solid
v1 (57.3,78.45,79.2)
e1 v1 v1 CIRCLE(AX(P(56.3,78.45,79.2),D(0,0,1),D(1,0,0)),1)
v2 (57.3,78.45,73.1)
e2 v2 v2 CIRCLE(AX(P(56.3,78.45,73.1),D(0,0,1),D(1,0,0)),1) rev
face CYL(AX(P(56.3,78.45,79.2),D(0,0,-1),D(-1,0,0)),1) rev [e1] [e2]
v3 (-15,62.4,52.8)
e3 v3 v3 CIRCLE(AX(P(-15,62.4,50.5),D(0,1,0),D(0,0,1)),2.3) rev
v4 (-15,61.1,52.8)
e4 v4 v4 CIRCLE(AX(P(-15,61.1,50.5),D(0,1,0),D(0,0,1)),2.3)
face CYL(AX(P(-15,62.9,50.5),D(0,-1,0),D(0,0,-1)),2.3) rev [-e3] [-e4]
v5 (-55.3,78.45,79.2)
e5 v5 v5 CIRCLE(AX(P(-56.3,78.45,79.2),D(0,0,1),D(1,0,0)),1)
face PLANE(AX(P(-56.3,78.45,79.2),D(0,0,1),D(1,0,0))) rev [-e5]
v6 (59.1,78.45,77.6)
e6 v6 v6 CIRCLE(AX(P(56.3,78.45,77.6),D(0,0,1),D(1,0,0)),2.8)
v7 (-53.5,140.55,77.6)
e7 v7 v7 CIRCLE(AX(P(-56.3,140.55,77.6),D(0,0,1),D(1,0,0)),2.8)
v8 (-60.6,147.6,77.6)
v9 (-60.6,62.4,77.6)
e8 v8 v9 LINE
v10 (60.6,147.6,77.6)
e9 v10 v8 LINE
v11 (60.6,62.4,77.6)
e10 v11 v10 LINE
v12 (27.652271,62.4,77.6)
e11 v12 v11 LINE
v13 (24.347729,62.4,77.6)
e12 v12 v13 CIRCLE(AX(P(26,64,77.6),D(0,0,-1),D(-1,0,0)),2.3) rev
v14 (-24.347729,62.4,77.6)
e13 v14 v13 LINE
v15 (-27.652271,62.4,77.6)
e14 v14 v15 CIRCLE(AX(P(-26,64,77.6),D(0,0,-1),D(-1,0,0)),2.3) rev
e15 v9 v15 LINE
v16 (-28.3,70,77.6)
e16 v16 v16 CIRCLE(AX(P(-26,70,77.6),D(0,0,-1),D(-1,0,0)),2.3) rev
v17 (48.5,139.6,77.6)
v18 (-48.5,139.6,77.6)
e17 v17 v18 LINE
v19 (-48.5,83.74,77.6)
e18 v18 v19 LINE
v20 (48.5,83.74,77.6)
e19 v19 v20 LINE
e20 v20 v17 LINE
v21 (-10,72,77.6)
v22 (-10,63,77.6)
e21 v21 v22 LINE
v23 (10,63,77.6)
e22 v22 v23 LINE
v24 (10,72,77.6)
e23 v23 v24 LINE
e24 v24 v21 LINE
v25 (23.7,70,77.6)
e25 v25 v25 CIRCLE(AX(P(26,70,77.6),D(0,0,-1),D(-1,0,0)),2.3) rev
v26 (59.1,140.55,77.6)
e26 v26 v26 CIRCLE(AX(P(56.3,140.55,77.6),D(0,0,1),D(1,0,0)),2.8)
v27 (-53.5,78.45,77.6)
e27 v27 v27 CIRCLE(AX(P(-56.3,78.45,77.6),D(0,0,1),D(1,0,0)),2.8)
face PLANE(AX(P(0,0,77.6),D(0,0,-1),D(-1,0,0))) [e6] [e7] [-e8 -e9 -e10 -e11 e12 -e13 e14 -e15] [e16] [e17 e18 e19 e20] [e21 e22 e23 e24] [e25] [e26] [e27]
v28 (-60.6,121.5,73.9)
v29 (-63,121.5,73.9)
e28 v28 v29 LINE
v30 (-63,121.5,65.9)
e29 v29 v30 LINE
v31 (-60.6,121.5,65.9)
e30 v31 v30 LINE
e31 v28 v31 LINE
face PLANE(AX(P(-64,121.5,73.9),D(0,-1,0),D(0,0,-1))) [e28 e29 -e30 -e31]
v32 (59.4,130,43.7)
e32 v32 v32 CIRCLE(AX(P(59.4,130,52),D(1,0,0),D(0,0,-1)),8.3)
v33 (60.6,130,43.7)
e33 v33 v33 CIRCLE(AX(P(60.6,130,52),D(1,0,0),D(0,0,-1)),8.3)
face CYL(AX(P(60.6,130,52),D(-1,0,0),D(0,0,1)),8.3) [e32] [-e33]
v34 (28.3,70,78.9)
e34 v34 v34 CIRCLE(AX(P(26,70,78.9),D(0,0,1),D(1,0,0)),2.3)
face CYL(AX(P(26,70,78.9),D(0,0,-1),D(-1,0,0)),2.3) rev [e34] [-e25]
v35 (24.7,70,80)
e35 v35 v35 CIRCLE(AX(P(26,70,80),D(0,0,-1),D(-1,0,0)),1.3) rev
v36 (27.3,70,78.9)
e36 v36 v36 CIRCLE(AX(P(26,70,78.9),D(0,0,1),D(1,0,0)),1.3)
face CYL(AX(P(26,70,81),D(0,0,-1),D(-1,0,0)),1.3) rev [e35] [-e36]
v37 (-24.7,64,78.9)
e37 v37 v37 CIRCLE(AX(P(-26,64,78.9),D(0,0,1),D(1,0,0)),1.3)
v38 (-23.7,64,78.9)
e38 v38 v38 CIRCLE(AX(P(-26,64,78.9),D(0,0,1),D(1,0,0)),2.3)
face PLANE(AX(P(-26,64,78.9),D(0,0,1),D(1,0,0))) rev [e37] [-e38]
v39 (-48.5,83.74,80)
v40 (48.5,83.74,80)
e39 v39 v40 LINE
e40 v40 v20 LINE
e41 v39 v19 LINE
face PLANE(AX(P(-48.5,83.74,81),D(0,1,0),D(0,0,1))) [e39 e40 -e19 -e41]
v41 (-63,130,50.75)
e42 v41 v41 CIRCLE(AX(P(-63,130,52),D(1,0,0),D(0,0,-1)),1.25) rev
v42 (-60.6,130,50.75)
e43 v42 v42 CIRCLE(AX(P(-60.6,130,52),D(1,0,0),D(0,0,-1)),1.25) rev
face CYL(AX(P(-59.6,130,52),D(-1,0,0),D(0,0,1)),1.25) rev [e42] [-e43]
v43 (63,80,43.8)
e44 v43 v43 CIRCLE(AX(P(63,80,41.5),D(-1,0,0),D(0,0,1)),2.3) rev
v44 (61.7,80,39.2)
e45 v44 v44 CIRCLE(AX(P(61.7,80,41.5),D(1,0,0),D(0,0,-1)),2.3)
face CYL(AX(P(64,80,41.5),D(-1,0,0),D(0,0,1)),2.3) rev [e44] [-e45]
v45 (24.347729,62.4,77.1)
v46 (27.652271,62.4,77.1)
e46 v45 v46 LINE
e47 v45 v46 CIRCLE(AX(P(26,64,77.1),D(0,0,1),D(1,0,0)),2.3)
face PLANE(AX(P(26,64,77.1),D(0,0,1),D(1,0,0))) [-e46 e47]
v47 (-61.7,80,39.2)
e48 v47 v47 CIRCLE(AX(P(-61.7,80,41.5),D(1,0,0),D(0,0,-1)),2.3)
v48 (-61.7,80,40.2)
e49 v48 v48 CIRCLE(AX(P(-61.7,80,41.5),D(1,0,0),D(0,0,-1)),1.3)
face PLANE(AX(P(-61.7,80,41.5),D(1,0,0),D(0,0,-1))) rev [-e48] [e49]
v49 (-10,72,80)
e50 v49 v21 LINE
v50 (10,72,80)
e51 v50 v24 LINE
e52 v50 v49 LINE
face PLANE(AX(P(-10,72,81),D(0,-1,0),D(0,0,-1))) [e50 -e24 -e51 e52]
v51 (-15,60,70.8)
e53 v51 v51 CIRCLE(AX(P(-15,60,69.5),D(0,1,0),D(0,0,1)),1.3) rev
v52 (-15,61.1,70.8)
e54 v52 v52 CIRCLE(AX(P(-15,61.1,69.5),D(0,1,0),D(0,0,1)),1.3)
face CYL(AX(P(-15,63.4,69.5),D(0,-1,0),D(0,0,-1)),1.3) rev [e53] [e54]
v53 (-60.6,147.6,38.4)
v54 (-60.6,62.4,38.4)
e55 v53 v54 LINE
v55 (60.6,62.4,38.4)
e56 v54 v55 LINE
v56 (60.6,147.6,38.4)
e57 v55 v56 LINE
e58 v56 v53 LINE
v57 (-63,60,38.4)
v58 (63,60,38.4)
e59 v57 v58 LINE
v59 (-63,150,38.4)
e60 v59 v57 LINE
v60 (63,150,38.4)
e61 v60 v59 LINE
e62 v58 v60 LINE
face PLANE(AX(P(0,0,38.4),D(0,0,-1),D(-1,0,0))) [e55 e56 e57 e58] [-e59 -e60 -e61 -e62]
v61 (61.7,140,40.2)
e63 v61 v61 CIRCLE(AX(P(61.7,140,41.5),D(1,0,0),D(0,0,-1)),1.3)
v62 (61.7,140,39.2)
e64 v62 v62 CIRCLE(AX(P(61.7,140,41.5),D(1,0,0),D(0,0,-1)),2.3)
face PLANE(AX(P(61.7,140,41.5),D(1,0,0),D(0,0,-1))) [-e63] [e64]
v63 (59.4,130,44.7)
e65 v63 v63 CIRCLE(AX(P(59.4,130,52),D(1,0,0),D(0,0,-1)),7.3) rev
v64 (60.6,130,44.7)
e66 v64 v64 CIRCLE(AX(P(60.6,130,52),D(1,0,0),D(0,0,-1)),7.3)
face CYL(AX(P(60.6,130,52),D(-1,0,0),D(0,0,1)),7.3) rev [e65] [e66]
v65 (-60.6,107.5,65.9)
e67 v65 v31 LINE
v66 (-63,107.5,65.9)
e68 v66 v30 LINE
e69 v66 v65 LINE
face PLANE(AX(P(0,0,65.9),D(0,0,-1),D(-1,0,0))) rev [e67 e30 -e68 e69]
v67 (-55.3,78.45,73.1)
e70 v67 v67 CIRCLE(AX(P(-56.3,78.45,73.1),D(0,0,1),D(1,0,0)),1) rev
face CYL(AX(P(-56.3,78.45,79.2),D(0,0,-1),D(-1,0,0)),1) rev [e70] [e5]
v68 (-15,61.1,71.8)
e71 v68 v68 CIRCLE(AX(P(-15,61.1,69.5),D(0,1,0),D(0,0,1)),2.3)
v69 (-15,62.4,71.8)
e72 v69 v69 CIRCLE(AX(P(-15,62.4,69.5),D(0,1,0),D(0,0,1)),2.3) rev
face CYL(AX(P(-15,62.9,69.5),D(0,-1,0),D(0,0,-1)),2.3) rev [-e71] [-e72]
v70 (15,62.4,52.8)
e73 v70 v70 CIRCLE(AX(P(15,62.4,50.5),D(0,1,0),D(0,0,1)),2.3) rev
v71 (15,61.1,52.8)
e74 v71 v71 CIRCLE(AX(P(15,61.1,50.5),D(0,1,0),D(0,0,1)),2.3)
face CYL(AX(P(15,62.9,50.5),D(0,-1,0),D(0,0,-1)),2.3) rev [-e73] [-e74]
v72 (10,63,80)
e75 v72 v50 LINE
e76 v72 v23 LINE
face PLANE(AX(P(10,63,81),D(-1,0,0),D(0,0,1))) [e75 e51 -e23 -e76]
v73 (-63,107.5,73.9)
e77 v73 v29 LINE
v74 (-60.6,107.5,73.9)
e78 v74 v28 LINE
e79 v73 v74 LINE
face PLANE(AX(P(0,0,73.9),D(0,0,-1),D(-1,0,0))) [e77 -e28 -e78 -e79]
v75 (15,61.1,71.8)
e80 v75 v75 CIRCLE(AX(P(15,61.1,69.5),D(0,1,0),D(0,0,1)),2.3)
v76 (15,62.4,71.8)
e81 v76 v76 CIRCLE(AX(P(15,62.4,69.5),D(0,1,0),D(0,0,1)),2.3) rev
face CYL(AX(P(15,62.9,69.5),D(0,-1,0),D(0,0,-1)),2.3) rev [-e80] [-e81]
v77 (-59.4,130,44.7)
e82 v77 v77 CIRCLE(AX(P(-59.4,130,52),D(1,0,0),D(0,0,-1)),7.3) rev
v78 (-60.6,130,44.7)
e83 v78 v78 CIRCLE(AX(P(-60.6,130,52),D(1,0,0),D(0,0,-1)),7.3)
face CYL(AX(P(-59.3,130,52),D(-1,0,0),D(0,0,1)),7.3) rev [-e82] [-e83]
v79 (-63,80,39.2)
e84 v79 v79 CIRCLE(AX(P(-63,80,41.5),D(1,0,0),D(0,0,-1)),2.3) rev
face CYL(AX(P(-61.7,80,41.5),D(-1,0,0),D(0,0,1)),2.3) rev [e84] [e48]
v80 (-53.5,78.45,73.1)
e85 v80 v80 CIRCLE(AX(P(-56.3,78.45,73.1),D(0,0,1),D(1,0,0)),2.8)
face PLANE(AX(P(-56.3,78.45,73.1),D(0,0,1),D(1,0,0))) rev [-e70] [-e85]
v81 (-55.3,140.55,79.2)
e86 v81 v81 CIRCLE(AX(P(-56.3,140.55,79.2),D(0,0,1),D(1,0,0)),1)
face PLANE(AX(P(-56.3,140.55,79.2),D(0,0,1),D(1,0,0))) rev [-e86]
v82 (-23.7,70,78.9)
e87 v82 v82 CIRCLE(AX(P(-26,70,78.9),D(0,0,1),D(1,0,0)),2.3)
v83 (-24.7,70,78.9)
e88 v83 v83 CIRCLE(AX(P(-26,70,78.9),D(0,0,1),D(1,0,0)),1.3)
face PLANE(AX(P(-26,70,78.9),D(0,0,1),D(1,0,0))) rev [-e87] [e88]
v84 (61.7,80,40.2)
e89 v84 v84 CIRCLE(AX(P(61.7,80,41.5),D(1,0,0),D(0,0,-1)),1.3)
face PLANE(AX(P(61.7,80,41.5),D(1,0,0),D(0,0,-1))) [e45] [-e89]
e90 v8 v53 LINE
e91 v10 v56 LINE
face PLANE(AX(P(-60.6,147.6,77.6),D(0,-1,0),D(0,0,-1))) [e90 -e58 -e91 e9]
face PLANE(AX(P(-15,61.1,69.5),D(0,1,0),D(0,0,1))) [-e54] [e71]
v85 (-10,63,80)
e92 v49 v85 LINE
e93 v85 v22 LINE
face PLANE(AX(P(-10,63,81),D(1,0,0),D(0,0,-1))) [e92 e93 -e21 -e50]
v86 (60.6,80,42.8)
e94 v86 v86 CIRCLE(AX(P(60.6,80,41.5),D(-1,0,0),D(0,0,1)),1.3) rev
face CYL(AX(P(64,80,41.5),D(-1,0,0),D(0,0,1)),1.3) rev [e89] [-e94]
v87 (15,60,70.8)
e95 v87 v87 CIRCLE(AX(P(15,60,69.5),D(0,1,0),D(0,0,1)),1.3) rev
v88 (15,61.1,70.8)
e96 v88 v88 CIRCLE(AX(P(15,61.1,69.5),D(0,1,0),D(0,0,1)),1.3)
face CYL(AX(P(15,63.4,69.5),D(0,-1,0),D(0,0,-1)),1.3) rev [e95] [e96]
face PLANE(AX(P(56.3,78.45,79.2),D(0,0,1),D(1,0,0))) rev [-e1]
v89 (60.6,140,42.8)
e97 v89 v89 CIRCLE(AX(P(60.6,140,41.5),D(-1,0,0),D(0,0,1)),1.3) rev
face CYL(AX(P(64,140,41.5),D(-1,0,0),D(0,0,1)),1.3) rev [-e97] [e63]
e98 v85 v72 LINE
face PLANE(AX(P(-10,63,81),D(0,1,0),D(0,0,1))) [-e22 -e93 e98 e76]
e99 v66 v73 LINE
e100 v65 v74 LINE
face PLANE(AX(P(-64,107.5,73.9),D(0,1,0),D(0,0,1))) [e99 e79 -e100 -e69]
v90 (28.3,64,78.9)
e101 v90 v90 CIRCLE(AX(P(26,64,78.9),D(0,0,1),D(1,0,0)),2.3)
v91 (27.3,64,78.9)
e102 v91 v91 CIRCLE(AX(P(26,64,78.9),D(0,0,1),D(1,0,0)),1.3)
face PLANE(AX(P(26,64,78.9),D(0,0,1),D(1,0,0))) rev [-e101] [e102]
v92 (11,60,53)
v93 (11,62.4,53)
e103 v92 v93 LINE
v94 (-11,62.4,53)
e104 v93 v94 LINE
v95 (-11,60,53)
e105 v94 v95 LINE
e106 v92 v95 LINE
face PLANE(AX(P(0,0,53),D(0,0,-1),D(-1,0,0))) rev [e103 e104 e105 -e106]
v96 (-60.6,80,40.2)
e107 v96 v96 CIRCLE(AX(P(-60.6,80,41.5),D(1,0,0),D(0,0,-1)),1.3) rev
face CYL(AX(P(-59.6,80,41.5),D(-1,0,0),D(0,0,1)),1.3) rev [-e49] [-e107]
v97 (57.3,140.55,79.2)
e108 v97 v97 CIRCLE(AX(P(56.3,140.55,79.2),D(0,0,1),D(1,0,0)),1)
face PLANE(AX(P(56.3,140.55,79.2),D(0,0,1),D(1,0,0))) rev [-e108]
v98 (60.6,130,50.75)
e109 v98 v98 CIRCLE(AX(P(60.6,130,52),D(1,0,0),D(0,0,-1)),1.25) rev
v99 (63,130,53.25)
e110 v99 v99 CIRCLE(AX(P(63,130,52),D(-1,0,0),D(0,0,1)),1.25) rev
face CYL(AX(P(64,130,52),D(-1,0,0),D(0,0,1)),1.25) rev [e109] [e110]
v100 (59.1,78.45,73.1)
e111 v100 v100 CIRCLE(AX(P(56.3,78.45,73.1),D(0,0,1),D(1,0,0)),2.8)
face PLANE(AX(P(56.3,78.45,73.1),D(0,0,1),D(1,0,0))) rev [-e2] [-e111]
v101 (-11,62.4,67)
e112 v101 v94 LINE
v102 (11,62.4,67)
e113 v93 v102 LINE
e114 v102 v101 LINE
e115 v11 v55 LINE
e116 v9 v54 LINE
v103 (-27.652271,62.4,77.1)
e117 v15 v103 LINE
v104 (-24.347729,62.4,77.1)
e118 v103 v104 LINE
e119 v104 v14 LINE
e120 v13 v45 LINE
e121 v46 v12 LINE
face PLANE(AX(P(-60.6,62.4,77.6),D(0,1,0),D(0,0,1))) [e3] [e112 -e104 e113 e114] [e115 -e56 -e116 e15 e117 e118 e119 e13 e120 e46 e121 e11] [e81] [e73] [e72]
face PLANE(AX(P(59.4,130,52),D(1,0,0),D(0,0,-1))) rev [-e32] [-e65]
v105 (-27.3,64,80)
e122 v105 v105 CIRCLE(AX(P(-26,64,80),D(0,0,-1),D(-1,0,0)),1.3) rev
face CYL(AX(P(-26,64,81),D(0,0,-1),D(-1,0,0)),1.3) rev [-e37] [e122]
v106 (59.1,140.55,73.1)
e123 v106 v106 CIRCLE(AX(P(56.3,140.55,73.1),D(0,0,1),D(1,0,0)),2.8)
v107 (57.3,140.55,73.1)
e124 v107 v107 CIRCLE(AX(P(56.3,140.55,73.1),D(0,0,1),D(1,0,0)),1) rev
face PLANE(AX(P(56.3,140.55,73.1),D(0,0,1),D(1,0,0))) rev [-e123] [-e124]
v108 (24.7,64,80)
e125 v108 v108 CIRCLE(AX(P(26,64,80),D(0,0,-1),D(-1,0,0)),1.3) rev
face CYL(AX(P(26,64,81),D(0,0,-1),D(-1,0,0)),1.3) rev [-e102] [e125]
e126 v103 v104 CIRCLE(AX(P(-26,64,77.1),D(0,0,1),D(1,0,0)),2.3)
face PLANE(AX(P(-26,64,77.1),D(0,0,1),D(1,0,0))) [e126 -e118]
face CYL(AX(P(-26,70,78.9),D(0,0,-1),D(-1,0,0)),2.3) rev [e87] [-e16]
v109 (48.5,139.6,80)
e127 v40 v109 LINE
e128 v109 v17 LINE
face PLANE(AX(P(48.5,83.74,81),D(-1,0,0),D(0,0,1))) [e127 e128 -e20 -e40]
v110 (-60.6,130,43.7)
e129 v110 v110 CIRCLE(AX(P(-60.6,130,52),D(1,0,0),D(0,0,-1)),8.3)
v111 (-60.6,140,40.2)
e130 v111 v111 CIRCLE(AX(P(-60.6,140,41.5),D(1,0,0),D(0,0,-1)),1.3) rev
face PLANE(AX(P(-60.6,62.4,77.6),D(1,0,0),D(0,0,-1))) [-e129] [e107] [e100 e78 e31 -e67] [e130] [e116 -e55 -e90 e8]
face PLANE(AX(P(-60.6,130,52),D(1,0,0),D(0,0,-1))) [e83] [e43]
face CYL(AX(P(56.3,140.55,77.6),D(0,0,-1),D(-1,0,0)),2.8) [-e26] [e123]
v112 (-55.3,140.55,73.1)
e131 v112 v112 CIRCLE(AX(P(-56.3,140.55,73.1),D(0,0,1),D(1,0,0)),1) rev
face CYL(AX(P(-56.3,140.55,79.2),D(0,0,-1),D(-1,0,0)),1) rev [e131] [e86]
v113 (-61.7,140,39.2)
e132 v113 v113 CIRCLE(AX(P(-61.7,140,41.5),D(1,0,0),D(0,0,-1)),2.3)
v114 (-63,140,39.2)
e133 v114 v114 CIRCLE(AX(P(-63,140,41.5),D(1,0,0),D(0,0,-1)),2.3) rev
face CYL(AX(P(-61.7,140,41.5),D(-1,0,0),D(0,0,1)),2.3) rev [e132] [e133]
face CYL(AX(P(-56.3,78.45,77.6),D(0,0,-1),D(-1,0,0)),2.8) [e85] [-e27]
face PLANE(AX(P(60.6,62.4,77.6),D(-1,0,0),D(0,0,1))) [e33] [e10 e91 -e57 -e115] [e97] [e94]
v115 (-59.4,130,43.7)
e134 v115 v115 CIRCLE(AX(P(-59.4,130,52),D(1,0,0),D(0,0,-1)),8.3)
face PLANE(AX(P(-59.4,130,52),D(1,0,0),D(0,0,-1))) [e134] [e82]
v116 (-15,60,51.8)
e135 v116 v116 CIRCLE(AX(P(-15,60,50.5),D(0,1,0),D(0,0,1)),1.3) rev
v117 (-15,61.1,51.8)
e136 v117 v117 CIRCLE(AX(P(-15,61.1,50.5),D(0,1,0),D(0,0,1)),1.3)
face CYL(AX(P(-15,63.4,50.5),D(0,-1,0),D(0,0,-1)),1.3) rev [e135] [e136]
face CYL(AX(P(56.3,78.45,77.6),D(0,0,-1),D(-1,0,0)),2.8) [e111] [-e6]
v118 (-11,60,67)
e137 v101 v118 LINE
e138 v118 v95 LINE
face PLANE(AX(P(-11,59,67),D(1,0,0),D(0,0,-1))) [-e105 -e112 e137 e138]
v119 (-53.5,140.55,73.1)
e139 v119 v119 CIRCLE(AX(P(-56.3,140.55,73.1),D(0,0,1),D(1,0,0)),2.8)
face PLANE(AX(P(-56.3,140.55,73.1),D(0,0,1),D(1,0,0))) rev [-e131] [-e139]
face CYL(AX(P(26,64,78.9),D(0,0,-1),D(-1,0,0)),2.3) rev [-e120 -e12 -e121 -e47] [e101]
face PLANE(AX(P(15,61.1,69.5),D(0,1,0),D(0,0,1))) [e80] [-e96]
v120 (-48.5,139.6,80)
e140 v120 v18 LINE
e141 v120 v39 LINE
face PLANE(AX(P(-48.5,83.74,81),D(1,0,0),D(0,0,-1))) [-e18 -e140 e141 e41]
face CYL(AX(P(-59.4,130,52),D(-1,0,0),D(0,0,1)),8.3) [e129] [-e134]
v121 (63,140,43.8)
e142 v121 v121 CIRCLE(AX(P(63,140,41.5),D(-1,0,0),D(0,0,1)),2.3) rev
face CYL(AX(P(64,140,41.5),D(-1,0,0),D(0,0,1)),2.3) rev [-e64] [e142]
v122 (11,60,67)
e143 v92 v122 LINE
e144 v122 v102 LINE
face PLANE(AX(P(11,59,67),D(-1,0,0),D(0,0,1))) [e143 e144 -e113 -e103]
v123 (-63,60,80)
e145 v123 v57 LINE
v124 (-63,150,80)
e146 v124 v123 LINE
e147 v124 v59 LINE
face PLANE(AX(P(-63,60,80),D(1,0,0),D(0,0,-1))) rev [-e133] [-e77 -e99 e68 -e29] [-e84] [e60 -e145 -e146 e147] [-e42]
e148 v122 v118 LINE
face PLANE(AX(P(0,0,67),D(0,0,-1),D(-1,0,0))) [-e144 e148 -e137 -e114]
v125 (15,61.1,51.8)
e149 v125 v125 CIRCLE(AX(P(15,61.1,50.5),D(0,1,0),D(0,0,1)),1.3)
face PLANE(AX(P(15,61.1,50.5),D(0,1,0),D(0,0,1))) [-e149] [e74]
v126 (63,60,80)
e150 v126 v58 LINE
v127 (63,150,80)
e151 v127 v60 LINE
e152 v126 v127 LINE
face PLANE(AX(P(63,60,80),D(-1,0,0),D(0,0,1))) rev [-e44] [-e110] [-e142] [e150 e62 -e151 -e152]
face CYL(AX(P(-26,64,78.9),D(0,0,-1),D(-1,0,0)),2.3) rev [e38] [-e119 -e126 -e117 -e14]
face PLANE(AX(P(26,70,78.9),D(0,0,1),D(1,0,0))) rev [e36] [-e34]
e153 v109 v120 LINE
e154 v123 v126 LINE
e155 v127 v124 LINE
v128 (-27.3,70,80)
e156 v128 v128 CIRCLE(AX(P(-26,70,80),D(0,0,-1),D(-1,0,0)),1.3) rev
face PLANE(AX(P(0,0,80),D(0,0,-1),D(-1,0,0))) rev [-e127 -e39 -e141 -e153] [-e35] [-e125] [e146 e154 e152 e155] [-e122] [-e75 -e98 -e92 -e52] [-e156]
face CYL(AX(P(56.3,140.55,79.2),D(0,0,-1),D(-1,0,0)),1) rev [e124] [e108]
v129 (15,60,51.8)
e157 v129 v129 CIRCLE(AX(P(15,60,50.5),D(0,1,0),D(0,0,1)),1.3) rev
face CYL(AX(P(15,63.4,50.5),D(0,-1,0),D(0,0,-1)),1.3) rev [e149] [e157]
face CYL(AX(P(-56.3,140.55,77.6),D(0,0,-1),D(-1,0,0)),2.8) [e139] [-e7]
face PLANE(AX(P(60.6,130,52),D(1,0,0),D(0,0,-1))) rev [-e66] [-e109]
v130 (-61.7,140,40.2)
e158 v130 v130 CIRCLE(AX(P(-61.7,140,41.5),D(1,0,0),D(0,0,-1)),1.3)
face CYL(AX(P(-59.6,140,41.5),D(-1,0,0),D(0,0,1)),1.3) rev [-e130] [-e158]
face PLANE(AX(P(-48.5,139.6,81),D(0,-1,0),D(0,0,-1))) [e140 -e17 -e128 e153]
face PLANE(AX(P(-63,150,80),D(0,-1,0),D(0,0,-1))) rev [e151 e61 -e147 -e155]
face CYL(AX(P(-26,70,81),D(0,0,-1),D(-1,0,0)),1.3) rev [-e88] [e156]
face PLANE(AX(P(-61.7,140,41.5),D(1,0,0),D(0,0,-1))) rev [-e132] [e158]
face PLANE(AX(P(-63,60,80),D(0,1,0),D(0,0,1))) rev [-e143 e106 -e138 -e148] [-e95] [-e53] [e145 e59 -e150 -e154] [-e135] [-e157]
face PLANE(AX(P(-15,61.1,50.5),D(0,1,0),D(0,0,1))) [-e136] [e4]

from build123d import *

# Parameters (mm, degrees)
BOSS_EXTRUDE1_START  = 38.4
SKETCH1_W            = 126
SKETCH1_H            = 90
BOSS_EXTRUDE1_DEPTH  = 41.6
BOSS_EXTRUDE2_START  = 36
SKETCH2_W            = 121.2
SKETCH2_H            = 85.2
BOSS_EXTRUDE2_DEPTH  = 41.6
BOSS_EXTRUDE3_START  = 76.6
SKETCH3_W            = 97
SKETCH3_H            = 55.86
BOSS_EXTRUDE3_DEPTH  = 4.4
BOSS_EXTRUDE4_START  = 73.1
SKETCH4_R            = 2.8
BOSS_EXTRUDE4_DEPTH  = 4.5
BOSS_EXTRUDE5_START  = 72.1
SKETCH5_R            = 1
BOSS_EXTRUDE5_DEPTH  = 7.1
BOSS_EXTRUDE6_START  = 73.1
SKETCH6_R            = 2.8
BOSS_EXTRUDE6_DEPTH  = 4.5
BOSS_EXTRUDE7_START  = 72.1
SKETCH7_R            = 1
BOSS_EXTRUDE7_DEPTH  = 7.1
BOSS_EXTRUDE8_START  = 73.1
SKETCH8_R            = 2.8
BOSS_EXTRUDE8_DEPTH  = 4.5
BOSS_EXTRUDE9_START  = 72.1
SKETCH9_R            = 1
BOSS_EXTRUDE9_DEPTH  = 7.1
BOSS_EXTRUDE10_START = 73.1
SKETCH10_R           = 2.8
BOSS_EXTRUDE10_DEPTH = 4.5
BOSS_EXTRUDE11_START = 72.1
SKETCH11_R           = 1
BOSS_EXTRUDE11_DEPTH = 7.1
BOSS_EXTRUDE12_START = 65.9
SKETCH12_W           = 3.9
SKETCH12_H           = 14
BOSS_EXTRUDE12_DEPTH = 8
BOSS_EXTRUDE13_START = -60.6
SKETCH13_R           = 8.3
BOSS_EXTRUDE13_DEPTH = 1.2
BOSS_EXTRUDE14_START = -60.6
SKETCH14_R           = 7.3
BOSS_EXTRUDE14_DEPTH = 1.3
BOSS_EXTRUDE15_START = -64
SKETCH15_R           = 1.25
BOSS_EXTRUDE15_DEPTH = 4.4
BOSS_EXTRUDE16_START = -64
SKETCH16_R           = 1.3
BOSS_EXTRUDE16_DEPTH = 4.4
BOSS_EXTRUDE17_START = -64
SKETCH17_R           = 2.3
BOSS_EXTRUDE17_DEPTH = 2.3
BOSS_EXTRUDE18_START = -64
SKETCH18_R           = 1.3
BOSS_EXTRUDE18_DEPTH = 4.4
BOSS_EXTRUDE19_START = -64
SKETCH19_R           = 2.3
BOSS_EXTRUDE19_DEPTH = 2.3
BOSS_EXTRUDE20_START = 59.4
SKETCH20_R           = 8.3
BOSS_EXTRUDE20_DEPTH = 1.2
BOSS_EXTRUDE21_START = 59.3
SKETCH21_R           = 7.3
BOSS_EXTRUDE21_DEPTH = 1.3
BOSS_EXTRUDE22_START = 59.6
SKETCH22_R           = 1.25
BOSS_EXTRUDE22_DEPTH = 4.4
BOSS_EXTRUDE23_START = 59.6
SKETCH23_R           = 1.3
BOSS_EXTRUDE23_DEPTH = 4.4
BOSS_EXTRUDE24_START = 61.7
SKETCH24_R           = 2.3
BOSS_EXTRUDE24_DEPTH = 2.3
BOSS_EXTRUDE25_START = 59.6
SKETCH25_R           = 1.3
BOSS_EXTRUDE25_DEPTH = 4.4
BOSS_EXTRUDE26_START = 61.7
SKETCH26_R           = 2.3
BOSS_EXTRUDE26_DEPTH = 2.3
BOSS_EXTRUDE27_START = 53
SKETCH27_W           = 22
SKETCH27_H           = 4.4
BOSS_EXTRUDE27_DEPTH = 14
BOSS_EXTRUDE28_START = 59
SKETCH28_R           = 1.3
BOSS_EXTRUDE28_DEPTH = 4.4
BOSS_EXTRUDE29_START = 61.1
SKETCH29_R           = 2.3
BOSS_EXTRUDE29_DEPTH = 1.8
BOSS_EXTRUDE30_START = 59
SKETCH30_R           = 1.3
BOSS_EXTRUDE30_DEPTH = 4.4
BOSS_EXTRUDE31_START = 61.1
SKETCH31_R           = 2.3
BOSS_EXTRUDE31_DEPTH = 1.8
BOSS_EXTRUDE32_START = 59
SKETCH32_R           = 1.3
BOSS_EXTRUDE32_DEPTH = 4.4
BOSS_EXTRUDE33_START = 61.1
SKETCH33_R           = 2.3
BOSS_EXTRUDE33_DEPTH = 1.8
BOSS_EXTRUDE34_START = 59
SKETCH34_R           = 1.3
BOSS_EXTRUDE34_DEPTH = 4.4
BOSS_EXTRUDE35_START = 61.1
SKETCH35_R           = 2.3
BOSS_EXTRUDE35_DEPTH = 1.8
BOSS_EXTRUDE36_START = 76.6
SKETCH36_W           = 20
SKETCH36_H           = 9
BOSS_EXTRUDE36_DEPTH = 4.4
BOSS_EXTRUDE37_START = 76.6
SKETCH37_R           = 1.3
BOSS_EXTRUDE37_DEPTH = 4.4
BOSS_EXTRUDE38_START = 77.1
SKETCH38_R           = 2.3
BOSS_EXTRUDE38_DEPTH = 1.8
BOSS_EXTRUDE39_START = 76.6
SKETCH39_R           = 1.3
BOSS_EXTRUDE39_DEPTH = 4.4
BOSS_EXTRUDE40_START = 77.1
SKETCH40_R           = 2.3
BOSS_EXTRUDE40_DEPTH = 1.8
BOSS_EXTRUDE41_START = 76.6
SKETCH41_R           = 1.3
BOSS_EXTRUDE41_DEPTH = 4.4
BOSS_EXTRUDE42_START = 77.1
SKETCH42_R           = 2.3
BOSS_EXTRUDE42_DEPTH = 1.8
BOSS_EXTRUDE43_START = 76.6
SKETCH43_R           = 1.3
BOSS_EXTRUDE43_DEPTH = 4.4
BOSS_EXTRUDE44_START = 77.1
SKETCH44_R           = 2.3
BOSS_EXTRUDE44_DEPTH = 1.8


with BuildPart() as part:
    # Sketch1 → Boss-Extrude1 (new body)
    with BuildSketch(Plane.XY.offset(BOSS_EXTRUDE1_START)):
        with Locations((0, 105)):
            Rectangle(SKETCH1_W, SKETCH1_H)
    extrude(amount=BOSS_EXTRUDE1_DEPTH)


with BuildPart() as body_2:
    # Sketch2 → Boss-Extrude2 (new body)
    with BuildSketch(Plane.XY.offset(BOSS_EXTRUDE2_START)):
        with Locations((0, 105)):
            Rectangle(SKETCH2_W, SKETCH2_H)
    extrude(amount=BOSS_EXTRUDE2_DEPTH)


with BuildPart() as part_1:
    add(part.part)

    # Combine1: cut body 2
    add(body_2.part, mode=Mode.SUBTRACT)


with BuildPart() as body_2_2:
    # Sketch3 → Boss-Extrude3 (new body)
    with BuildSketch(Plane.XY.offset(BOSS_EXTRUDE3_START)):
        with Locations((0, 111.67)):
            Rectangle(SKETCH3_W, SKETCH3_H)
    extrude(amount=BOSS_EXTRUDE3_DEPTH)


with BuildPart() as part_2:
    add(part_1.part)

    # Combine2: cut body 2 2
    add(body_2_2.part, mode=Mode.SUBTRACT)

    # Sketch4 → Boss-Extrude4 (add)
    with BuildSketch(Plane.XY.offset(BOSS_EXTRUDE4_START)):
        with Locations((-56.3, 78.45)):
            Circle(SKETCH4_R)
    extrude(amount=BOSS_EXTRUDE4_DEPTH)


with BuildPart() as body_2_3:
    # Sketch5 → Boss-Extrude5 (new body)
    with BuildSketch(Plane.XY.offset(BOSS_EXTRUDE5_START)):
        with Locations((-56.3, 78.45)):
            Circle(SKETCH5_R)
    extrude(amount=BOSS_EXTRUDE5_DEPTH)


with BuildPart() as part_3:
    add(part_2.part)

    # Combine3: cut body 2 3
    add(body_2_3.part, mode=Mode.SUBTRACT)

    # Sketch6 → Boss-Extrude6 (add)
    with BuildSketch(Plane.XY.offset(BOSS_EXTRUDE6_START)):
        with Locations((-56.3, 140.55)):
            Circle(SKETCH6_R)
    extrude(amount=BOSS_EXTRUDE6_DEPTH)


with BuildPart() as body_2_4:
    # Sketch7 → Boss-Extrude7 (new body)
    with BuildSketch(Plane.XY.offset(BOSS_EXTRUDE7_START)):
        with Locations((-56.3, 140.55)):
            Circle(SKETCH7_R)
    extrude(amount=BOSS_EXTRUDE7_DEPTH)


with BuildPart() as part_4:
    add(part_3.part)

    # Combine4: cut body 2 4
    add(body_2_4.part, mode=Mode.SUBTRACT)

    # Sketch8 → Boss-Extrude8 (add)
    with BuildSketch(Plane.XY.offset(BOSS_EXTRUDE8_START)):
        with Locations((56.3, 78.45)):
            Circle(SKETCH8_R)
    extrude(amount=BOSS_EXTRUDE8_DEPTH)


with BuildPart() as body_2_5:
    # Sketch9 → Boss-Extrude9 (new body)
    with BuildSketch(Plane.XY.offset(BOSS_EXTRUDE9_START)):
        with Locations((56.3, 78.45)):
            Circle(SKETCH9_R)
    extrude(amount=BOSS_EXTRUDE9_DEPTH)


with BuildPart() as part_5:
    add(part_4.part)

    # Combine5: cut body 2 5
    add(body_2_5.part, mode=Mode.SUBTRACT)

    # Sketch10 → Boss-Extrude10 (add)
    with BuildSketch(Plane.XY.offset(BOSS_EXTRUDE10_START)):
        with Locations((56.3, 140.55)):
            Circle(SKETCH10_R)
    extrude(amount=BOSS_EXTRUDE10_DEPTH)


with BuildPart() as body_2_6:
    # Sketch11 → Boss-Extrude11 (new body)
    with BuildSketch(Plane.XY.offset(BOSS_EXTRUDE11_START)):
        with Locations((56.3, 140.55)):
            Circle(SKETCH11_R)
    extrude(amount=BOSS_EXTRUDE11_DEPTH)


with BuildPart() as part_6:
    add(part_5.part)

    # Combine6: cut body 2 6
    add(body_2_6.part, mode=Mode.SUBTRACT)


with BuildPart() as body_2_7:
    # Sketch12 → Boss-Extrude12 (new body)
    with BuildSketch(Plane.XY.offset(BOSS_EXTRUDE12_START)):
        with Locations((-62.05, 114.5)):
            Rectangle(SKETCH12_W, SKETCH12_H)
    extrude(amount=BOSS_EXTRUDE12_DEPTH)


with BuildPart() as part_7:
    add(part_6.part)

    # Combine7: cut body 2 7
    add(body_2_7.part, mode=Mode.SUBTRACT)

    # Sketch13 → Boss-Extrude13 (add)
    with BuildSketch(Plane(origin=(0, 0, 0), x_dir=(0, 0, -1), z_dir=(1, 0, 0)).offset(BOSS_EXTRUDE13_START)):
        with Locations((-52, 130)):
            Circle(SKETCH13_R)
    extrude(amount=BOSS_EXTRUDE13_DEPTH)


with BuildPart() as body_2_8:
    # Sketch14 → Boss-Extrude14 (new body)
    with BuildSketch(Plane(origin=(0, 0, 0), x_dir=(0, 0, -1), z_dir=(1, 0, 0)).offset(BOSS_EXTRUDE14_START)):
        with Locations((-52, 130)):
            Circle(SKETCH14_R)
    extrude(amount=BOSS_EXTRUDE14_DEPTH)


with BuildPart() as part_8:
    add(part_7.part)

    # Combine8: cut body 2 8
    add(body_2_8.part, mode=Mode.SUBTRACT)


with BuildPart() as body_2_9:
    # Sketch15 → Boss-Extrude15 (new body)
    with BuildSketch(Plane(origin=(0, 0, 0), x_dir=(0, 0, -1), z_dir=(1, 0, 0)).offset(BOSS_EXTRUDE15_START)):
        with Locations((-52, 130)):
            Circle(SKETCH15_R)
    extrude(amount=BOSS_EXTRUDE15_DEPTH)


with BuildPart() as part_9:
    add(part_8.part)

    # Combine9: cut body 2 9
    add(body_2_9.part, mode=Mode.SUBTRACT)


with BuildPart() as body_2_10:
    # Sketch16 → Boss-Extrude16 (new body)
    with BuildSketch(Plane(origin=(0, 0, 0), x_dir=(0, 0, -1), z_dir=(1, 0, 0)).offset(BOSS_EXTRUDE16_START)):
        with Locations((-41.5, 80)):
            Circle(SKETCH16_R)
    extrude(amount=BOSS_EXTRUDE16_DEPTH)


with BuildPart() as part_10:
    add(part_9.part)

    # Combine10: cut body 2 10
    add(body_2_10.part, mode=Mode.SUBTRACT)


with BuildPart() as body_2_11:
    # Sketch17 → Boss-Extrude17 (new body)
    with BuildSketch(Plane(origin=(0, 0, 0), x_dir=(0, 0, -1), z_dir=(1, 0, 0)).offset(BOSS_EXTRUDE17_START)):
        with Locations((-41.5, 80)):
            Circle(SKETCH17_R)
    extrude(amount=BOSS_EXTRUDE17_DEPTH)


with BuildPart() as part_11:
    add(part_10.part)

    # Combine11: cut body 2 11
    add(body_2_11.part, mode=Mode.SUBTRACT)


with BuildPart() as body_2_12:
    # Sketch18 → Boss-Extrude18 (new body)
    with BuildSketch(Plane(origin=(0, 0, 0), x_dir=(0, 0, -1), z_dir=(1, 0, 0)).offset(BOSS_EXTRUDE18_START)):
        with Locations((-41.5, 140)):
            Circle(SKETCH18_R)
    extrude(amount=BOSS_EXTRUDE18_DEPTH)


with BuildPart() as part_12:
    add(part_11.part)

    # Combine12: cut body 2 12
    add(body_2_12.part, mode=Mode.SUBTRACT)


with BuildPart() as body_2_13:
    # Sketch19 → Boss-Extrude19 (new body)
    with BuildSketch(Plane(origin=(0, 0, 0), x_dir=(0, 0, -1), z_dir=(1, 0, 0)).offset(BOSS_EXTRUDE19_START)):
        with Locations((-41.5, 140)):
            Circle(SKETCH19_R)
    extrude(amount=BOSS_EXTRUDE19_DEPTH)


with BuildPart() as part_13:
    add(part_12.part)

    # Combine13: cut body 2 13
    add(body_2_13.part, mode=Mode.SUBTRACT)

    # Sketch20 → Boss-Extrude20 (add)
    with BuildSketch(Plane(origin=(0, 0, 0), x_dir=(0, 0, -1), z_dir=(1, 0, 0)).offset(BOSS_EXTRUDE20_START)):
        with Locations((-52, 130)):
            Circle(SKETCH20_R)
    extrude(amount=BOSS_EXTRUDE20_DEPTH)


with BuildPart() as body_2_14:
    # Sketch21 → Boss-Extrude21 (new body)
    with BuildSketch(Plane(origin=(0, 0, 0), x_dir=(0, 0, -1), z_dir=(1, 0, 0)).offset(BOSS_EXTRUDE21_START)):
        with Locations((-52, 130)):
            Circle(SKETCH21_R)
    extrude(amount=BOSS_EXTRUDE21_DEPTH)


with BuildPart() as part_14:
    add(part_13.part)

    # Combine14: cut body 2 14
    add(body_2_14.part, mode=Mode.SUBTRACT)


with BuildPart() as body_2_15:
    # Sketch22 → Boss-Extrude22 (new body)
    with BuildSketch(Plane(origin=(0, 0, 0), x_dir=(0, 0, -1), z_dir=(1, 0, 0)).offset(BOSS_EXTRUDE22_START)):
        with Locations((-52, 130)):
            Circle(SKETCH22_R)
    extrude(amount=BOSS_EXTRUDE22_DEPTH)


with BuildPart() as part_15:
    add(part_14.part)

    # Combine15: cut body 2 15
    add(body_2_15.part, mode=Mode.SUBTRACT)


with BuildPart() as body_2_16:
    # Sketch23 → Boss-Extrude23 (new body)
    with BuildSketch(Plane(origin=(0, 0, 0), x_dir=(0, 0, -1), z_dir=(1, 0, 0)).offset(BOSS_EXTRUDE23_START)):
        with Locations((-41.5, 80)):
            Circle(SKETCH23_R)
    extrude(amount=BOSS_EXTRUDE23_DEPTH)


with BuildPart() as part_16:
    add(part_15.part)

    # Combine16: cut body 2 16
    add(body_2_16.part, mode=Mode.SUBTRACT)


with BuildPart() as body_2_17:
    # Sketch24 → Boss-Extrude24 (new body)
    with BuildSketch(Plane(origin=(0, 0, 0), x_dir=(0, 0, -1), z_dir=(1, 0, 0)).offset(BOSS_EXTRUDE24_START)):
        with Locations((-41.5, 80)):
            Circle(SKETCH24_R)
    extrude(amount=BOSS_EXTRUDE24_DEPTH)


with BuildPart() as part_17:
    add(part_16.part)

    # Combine17: cut body 2 17
    add(body_2_17.part, mode=Mode.SUBTRACT)


with BuildPart() as body_2_18:
    # Sketch25 → Boss-Extrude25 (new body)
    with BuildSketch(Plane(origin=(0, 0, 0), x_dir=(0, 0, -1), z_dir=(1, 0, 0)).offset(BOSS_EXTRUDE25_START)):
        with Locations((-41.5, 140)):
            Circle(SKETCH25_R)
    extrude(amount=BOSS_EXTRUDE25_DEPTH)


with BuildPart() as part_18:
    add(part_17.part)

    # Combine18: cut body 2 18
    add(body_2_18.part, mode=Mode.SUBTRACT)


with BuildPart() as body_2_19:
    # Sketch26 → Boss-Extrude26 (new body)
    with BuildSketch(Plane(origin=(0, 0, 0), x_dir=(0, 0, -1), z_dir=(1, 0, 0)).offset(BOSS_EXTRUDE26_START)):
        with Locations((-41.5, 140)):
            Circle(SKETCH26_R)
    extrude(amount=BOSS_EXTRUDE26_DEPTH)


with BuildPart() as part_19:
    add(part_18.part)

    # Combine19: cut body 2 19
    add(body_2_19.part, mode=Mode.SUBTRACT)


with BuildPart() as body_2_20:
    # Sketch27 → Boss-Extrude27 (new body)
    with BuildSketch(Plane.XY.offset(BOSS_EXTRUDE27_START)):
        with Locations((0, 61.2)):
            Rectangle(SKETCH27_W, SKETCH27_H)
    extrude(amount=BOSS_EXTRUDE27_DEPTH)


with BuildPart() as part_20:
    add(part_19.part)

    # Combine20: cut body 2 20
    add(body_2_20.part, mode=Mode.SUBTRACT)


with BuildPart() as body_2_21:
    # Sketch28 → Boss-Extrude28 (new body)
    with BuildSketch(Plane(origin=(0, 0, 0), x_dir=(1, 0, 0), z_dir=(0, 1, 0)).offset(BOSS_EXTRUDE28_START)):
        with Locations((-15, -50.5)):
            Circle(SKETCH28_R)
    extrude(amount=BOSS_EXTRUDE28_DEPTH)


with BuildPart() as part_21:
    add(part_20.part)

    # Combine21: cut body 2 21
    add(body_2_21.part, mode=Mode.SUBTRACT)


with BuildPart() as body_2_22:
    # Sketch29 → Boss-Extrude29 (new body)
    with BuildSketch(Plane(origin=(0, 0, 0), x_dir=(1, 0, 0), z_dir=(0, 1, 0)).offset(BOSS_EXTRUDE29_START)):
        with Locations((-15, -50.5)):
            Circle(SKETCH29_R)
    extrude(amount=BOSS_EXTRUDE29_DEPTH)


with BuildPart() as part_22:
    add(part_21.part)

    # Combine22: cut body 2 22
    add(body_2_22.part, mode=Mode.SUBTRACT)


with BuildPart() as body_2_23:
    # Sketch30 → Boss-Extrude30 (new body)
    with BuildSketch(Plane(origin=(0, 0, 0), x_dir=(1, 0, 0), z_dir=(0, 1, 0)).offset(BOSS_EXTRUDE30_START)):
        with Locations((-15, -69.5)):
            Circle(SKETCH30_R)
    extrude(amount=BOSS_EXTRUDE30_DEPTH)


with BuildPart() as part_23:
    add(part_22.part)

    # Combine23: cut body 2 23
    add(body_2_23.part, mode=Mode.SUBTRACT)


with BuildPart() as body_2_24:
    # Sketch31 → Boss-Extrude31 (new body)
    with BuildSketch(Plane(origin=(0, 0, 0), x_dir=(1, 0, 0), z_dir=(0, 1, 0)).offset(BOSS_EXTRUDE31_START)):
        with Locations((-15, -69.5)):
            Circle(SKETCH31_R)
    extrude(amount=BOSS_EXTRUDE31_DEPTH)


with BuildPart() as part_24:
    add(part_23.part)

    # Combine24: cut body 2 24
    add(body_2_24.part, mode=Mode.SUBTRACT)


with BuildPart() as body_2_25:
    # Sketch32 → Boss-Extrude32 (new body)
    with BuildSketch(Plane(origin=(0, 0, 0), x_dir=(1, 0, 0), z_dir=(0, 1, 0)).offset(BOSS_EXTRUDE32_START)):
        with Locations((15, -50.5)):
            Circle(SKETCH32_R)
    extrude(amount=BOSS_EXTRUDE32_DEPTH)


with BuildPart() as part_25:
    add(part_24.part)

    # Combine25: cut body 2 25
    add(body_2_25.part, mode=Mode.SUBTRACT)


with BuildPart() as body_2_26:
    # Sketch33 → Boss-Extrude33 (new body)
    with BuildSketch(Plane(origin=(0, 0, 0), x_dir=(1, 0, 0), z_dir=(0, 1, 0)).offset(BOSS_EXTRUDE33_START)):
        with Locations((15, -50.5)):
            Circle(SKETCH33_R)
    extrude(amount=BOSS_EXTRUDE33_DEPTH)


with BuildPart() as part_26:
    add(part_25.part)

    # Combine26: cut body 2 26
    add(body_2_26.part, mode=Mode.SUBTRACT)


with BuildPart() as body_2_27:
    # Sketch34 → Boss-Extrude34 (new body)
    with BuildSketch(Plane(origin=(0, 0, 0), x_dir=(1, 0, 0), z_dir=(0, 1, 0)).offset(BOSS_EXTRUDE34_START)):
        with Locations((15, -69.5)):
            Circle(SKETCH34_R)
    extrude(amount=BOSS_EXTRUDE34_DEPTH)


with BuildPart() as part_27:
    add(part_26.part)

    # Combine27: cut body 2 27
    add(body_2_27.part, mode=Mode.SUBTRACT)


with BuildPart() as body_2_28:
    # Sketch35 → Boss-Extrude35 (new body)
    with BuildSketch(Plane(origin=(0, 0, 0), x_dir=(1, 0, 0), z_dir=(0, 1, 0)).offset(BOSS_EXTRUDE35_START)):
        with Locations((15, -69.5)):
            Circle(SKETCH35_R)
    extrude(amount=BOSS_EXTRUDE35_DEPTH)


with BuildPart() as part_28:
    add(part_27.part)

    # Combine28: cut body 2 28
    add(body_2_28.part, mode=Mode.SUBTRACT)


with BuildPart() as body_2_29:
    # Sketch36 → Boss-Extrude36 (new body)
    with BuildSketch(Plane.XY.offset(BOSS_EXTRUDE36_START)):
        with Locations((0, 67.5)):
            Rectangle(SKETCH36_W, SKETCH36_H)
    extrude(amount=BOSS_EXTRUDE36_DEPTH)


with BuildPart() as part_29:
    add(part_28.part)

    # Combine29: cut body 2 29
    add(body_2_29.part, mode=Mode.SUBTRACT)


with BuildPart() as body_2_30:
    # Sketch37 → Boss-Extrude37 (new body)
    with BuildSketch(Plane.XY.offset(BOSS_EXTRUDE37_START)):
        with Locations((-26, 64)):
            Circle(SKETCH37_R)
    extrude(amount=BOSS_EXTRUDE37_DEPTH)


with BuildPart() as part_30:
    add(part_29.part)

    # Combine30: cut body 2 30
    add(body_2_30.part, mode=Mode.SUBTRACT)


with BuildPart() as body_2_31:
    # Sketch38 → Boss-Extrude38 (new body)
    with BuildSketch(Plane.XY.offset(BOSS_EXTRUDE38_START)):
        with Locations((-26, 64)):
            Circle(SKETCH38_R)
    extrude(amount=BOSS_EXTRUDE38_DEPTH)


with BuildPart() as part_31:
    add(part_30.part)

    # Combine31: cut body 2 31
    add(body_2_31.part, mode=Mode.SUBTRACT)


with BuildPart() as body_2_32:
    # Sketch39 → Boss-Extrude39 (new body)
    with BuildSketch(Plane.XY.offset(BOSS_EXTRUDE39_START)):
        with Locations((-26, 70)):
            Circle(SKETCH39_R)
    extrude(amount=BOSS_EXTRUDE39_DEPTH)


with BuildPart() as part_32:
    add(part_31.part)

    # Combine32: cut body 2 32
    add(body_2_32.part, mode=Mode.SUBTRACT)


with BuildPart() as body_2_33:
    # Sketch40 → Boss-Extrude40 (new body)
    with BuildSketch(Plane.XY.offset(BOSS_EXTRUDE40_START)):
        with Locations((-26, 70)):
            Circle(SKETCH40_R)
    extrude(amount=BOSS_EXTRUDE40_DEPTH)


with BuildPart() as part_33:
    add(part_32.part)

    # Combine33: cut body 2 33
    add(body_2_33.part, mode=Mode.SUBTRACT)


with BuildPart() as body_2_34:
    # Sketch41 → Boss-Extrude41 (new body)
    with BuildSketch(Plane.XY.offset(BOSS_EXTRUDE41_START)):
        with Locations((26, 64)):
            Circle(SKETCH41_R)
    extrude(amount=BOSS_EXTRUDE41_DEPTH)


with BuildPart() as part_34:
    add(part_33.part)

    # Combine34: cut body 2 34
    add(body_2_34.part, mode=Mode.SUBTRACT)


with BuildPart() as body_2_35:
    # Sketch42 → Boss-Extrude42 (new body)
    with BuildSketch(Plane.XY.offset(BOSS_EXTRUDE42_START)):
        with Locations((26, 64)):
            Circle(SKETCH42_R)
    extrude(amount=BOSS_EXTRUDE42_DEPTH)


with BuildPart() as part_35:
    add(part_34.part)

    # Combine35: cut body 2 35
    add(body_2_35.part, mode=Mode.SUBTRACT)


with BuildPart() as body_2_36:
    # Sketch43 → Boss-Extrude43 (new body)
    with BuildSketch(Plane.XY.offset(BOSS_EXTRUDE43_START)):
        with Locations((26, 70)):
            Circle(SKETCH43_R)
    extrude(amount=BOSS_EXTRUDE43_DEPTH)


with BuildPart() as part_36:
    add(part_35.part)

    # Combine36: cut body 2 36
    add(body_2_36.part, mode=Mode.SUBTRACT)


with BuildPart() as body_2_37:
    # Sketch44 → Boss-Extrude44 (new body)
    with BuildSketch(Plane.XY.offset(BOSS_EXTRUDE44_START)):
        with Locations((26, 70)):
            Circle(SKETCH44_R)
    extrude(amount=BOSS_EXTRUDE44_DEPTH)


with BuildPart() as part_37:
    add(part_36.part)

    # Combine37: cut body 2 37
    add(body_2_37.part, mode=Mode.SUBTRACT)


solid = part_37.part
